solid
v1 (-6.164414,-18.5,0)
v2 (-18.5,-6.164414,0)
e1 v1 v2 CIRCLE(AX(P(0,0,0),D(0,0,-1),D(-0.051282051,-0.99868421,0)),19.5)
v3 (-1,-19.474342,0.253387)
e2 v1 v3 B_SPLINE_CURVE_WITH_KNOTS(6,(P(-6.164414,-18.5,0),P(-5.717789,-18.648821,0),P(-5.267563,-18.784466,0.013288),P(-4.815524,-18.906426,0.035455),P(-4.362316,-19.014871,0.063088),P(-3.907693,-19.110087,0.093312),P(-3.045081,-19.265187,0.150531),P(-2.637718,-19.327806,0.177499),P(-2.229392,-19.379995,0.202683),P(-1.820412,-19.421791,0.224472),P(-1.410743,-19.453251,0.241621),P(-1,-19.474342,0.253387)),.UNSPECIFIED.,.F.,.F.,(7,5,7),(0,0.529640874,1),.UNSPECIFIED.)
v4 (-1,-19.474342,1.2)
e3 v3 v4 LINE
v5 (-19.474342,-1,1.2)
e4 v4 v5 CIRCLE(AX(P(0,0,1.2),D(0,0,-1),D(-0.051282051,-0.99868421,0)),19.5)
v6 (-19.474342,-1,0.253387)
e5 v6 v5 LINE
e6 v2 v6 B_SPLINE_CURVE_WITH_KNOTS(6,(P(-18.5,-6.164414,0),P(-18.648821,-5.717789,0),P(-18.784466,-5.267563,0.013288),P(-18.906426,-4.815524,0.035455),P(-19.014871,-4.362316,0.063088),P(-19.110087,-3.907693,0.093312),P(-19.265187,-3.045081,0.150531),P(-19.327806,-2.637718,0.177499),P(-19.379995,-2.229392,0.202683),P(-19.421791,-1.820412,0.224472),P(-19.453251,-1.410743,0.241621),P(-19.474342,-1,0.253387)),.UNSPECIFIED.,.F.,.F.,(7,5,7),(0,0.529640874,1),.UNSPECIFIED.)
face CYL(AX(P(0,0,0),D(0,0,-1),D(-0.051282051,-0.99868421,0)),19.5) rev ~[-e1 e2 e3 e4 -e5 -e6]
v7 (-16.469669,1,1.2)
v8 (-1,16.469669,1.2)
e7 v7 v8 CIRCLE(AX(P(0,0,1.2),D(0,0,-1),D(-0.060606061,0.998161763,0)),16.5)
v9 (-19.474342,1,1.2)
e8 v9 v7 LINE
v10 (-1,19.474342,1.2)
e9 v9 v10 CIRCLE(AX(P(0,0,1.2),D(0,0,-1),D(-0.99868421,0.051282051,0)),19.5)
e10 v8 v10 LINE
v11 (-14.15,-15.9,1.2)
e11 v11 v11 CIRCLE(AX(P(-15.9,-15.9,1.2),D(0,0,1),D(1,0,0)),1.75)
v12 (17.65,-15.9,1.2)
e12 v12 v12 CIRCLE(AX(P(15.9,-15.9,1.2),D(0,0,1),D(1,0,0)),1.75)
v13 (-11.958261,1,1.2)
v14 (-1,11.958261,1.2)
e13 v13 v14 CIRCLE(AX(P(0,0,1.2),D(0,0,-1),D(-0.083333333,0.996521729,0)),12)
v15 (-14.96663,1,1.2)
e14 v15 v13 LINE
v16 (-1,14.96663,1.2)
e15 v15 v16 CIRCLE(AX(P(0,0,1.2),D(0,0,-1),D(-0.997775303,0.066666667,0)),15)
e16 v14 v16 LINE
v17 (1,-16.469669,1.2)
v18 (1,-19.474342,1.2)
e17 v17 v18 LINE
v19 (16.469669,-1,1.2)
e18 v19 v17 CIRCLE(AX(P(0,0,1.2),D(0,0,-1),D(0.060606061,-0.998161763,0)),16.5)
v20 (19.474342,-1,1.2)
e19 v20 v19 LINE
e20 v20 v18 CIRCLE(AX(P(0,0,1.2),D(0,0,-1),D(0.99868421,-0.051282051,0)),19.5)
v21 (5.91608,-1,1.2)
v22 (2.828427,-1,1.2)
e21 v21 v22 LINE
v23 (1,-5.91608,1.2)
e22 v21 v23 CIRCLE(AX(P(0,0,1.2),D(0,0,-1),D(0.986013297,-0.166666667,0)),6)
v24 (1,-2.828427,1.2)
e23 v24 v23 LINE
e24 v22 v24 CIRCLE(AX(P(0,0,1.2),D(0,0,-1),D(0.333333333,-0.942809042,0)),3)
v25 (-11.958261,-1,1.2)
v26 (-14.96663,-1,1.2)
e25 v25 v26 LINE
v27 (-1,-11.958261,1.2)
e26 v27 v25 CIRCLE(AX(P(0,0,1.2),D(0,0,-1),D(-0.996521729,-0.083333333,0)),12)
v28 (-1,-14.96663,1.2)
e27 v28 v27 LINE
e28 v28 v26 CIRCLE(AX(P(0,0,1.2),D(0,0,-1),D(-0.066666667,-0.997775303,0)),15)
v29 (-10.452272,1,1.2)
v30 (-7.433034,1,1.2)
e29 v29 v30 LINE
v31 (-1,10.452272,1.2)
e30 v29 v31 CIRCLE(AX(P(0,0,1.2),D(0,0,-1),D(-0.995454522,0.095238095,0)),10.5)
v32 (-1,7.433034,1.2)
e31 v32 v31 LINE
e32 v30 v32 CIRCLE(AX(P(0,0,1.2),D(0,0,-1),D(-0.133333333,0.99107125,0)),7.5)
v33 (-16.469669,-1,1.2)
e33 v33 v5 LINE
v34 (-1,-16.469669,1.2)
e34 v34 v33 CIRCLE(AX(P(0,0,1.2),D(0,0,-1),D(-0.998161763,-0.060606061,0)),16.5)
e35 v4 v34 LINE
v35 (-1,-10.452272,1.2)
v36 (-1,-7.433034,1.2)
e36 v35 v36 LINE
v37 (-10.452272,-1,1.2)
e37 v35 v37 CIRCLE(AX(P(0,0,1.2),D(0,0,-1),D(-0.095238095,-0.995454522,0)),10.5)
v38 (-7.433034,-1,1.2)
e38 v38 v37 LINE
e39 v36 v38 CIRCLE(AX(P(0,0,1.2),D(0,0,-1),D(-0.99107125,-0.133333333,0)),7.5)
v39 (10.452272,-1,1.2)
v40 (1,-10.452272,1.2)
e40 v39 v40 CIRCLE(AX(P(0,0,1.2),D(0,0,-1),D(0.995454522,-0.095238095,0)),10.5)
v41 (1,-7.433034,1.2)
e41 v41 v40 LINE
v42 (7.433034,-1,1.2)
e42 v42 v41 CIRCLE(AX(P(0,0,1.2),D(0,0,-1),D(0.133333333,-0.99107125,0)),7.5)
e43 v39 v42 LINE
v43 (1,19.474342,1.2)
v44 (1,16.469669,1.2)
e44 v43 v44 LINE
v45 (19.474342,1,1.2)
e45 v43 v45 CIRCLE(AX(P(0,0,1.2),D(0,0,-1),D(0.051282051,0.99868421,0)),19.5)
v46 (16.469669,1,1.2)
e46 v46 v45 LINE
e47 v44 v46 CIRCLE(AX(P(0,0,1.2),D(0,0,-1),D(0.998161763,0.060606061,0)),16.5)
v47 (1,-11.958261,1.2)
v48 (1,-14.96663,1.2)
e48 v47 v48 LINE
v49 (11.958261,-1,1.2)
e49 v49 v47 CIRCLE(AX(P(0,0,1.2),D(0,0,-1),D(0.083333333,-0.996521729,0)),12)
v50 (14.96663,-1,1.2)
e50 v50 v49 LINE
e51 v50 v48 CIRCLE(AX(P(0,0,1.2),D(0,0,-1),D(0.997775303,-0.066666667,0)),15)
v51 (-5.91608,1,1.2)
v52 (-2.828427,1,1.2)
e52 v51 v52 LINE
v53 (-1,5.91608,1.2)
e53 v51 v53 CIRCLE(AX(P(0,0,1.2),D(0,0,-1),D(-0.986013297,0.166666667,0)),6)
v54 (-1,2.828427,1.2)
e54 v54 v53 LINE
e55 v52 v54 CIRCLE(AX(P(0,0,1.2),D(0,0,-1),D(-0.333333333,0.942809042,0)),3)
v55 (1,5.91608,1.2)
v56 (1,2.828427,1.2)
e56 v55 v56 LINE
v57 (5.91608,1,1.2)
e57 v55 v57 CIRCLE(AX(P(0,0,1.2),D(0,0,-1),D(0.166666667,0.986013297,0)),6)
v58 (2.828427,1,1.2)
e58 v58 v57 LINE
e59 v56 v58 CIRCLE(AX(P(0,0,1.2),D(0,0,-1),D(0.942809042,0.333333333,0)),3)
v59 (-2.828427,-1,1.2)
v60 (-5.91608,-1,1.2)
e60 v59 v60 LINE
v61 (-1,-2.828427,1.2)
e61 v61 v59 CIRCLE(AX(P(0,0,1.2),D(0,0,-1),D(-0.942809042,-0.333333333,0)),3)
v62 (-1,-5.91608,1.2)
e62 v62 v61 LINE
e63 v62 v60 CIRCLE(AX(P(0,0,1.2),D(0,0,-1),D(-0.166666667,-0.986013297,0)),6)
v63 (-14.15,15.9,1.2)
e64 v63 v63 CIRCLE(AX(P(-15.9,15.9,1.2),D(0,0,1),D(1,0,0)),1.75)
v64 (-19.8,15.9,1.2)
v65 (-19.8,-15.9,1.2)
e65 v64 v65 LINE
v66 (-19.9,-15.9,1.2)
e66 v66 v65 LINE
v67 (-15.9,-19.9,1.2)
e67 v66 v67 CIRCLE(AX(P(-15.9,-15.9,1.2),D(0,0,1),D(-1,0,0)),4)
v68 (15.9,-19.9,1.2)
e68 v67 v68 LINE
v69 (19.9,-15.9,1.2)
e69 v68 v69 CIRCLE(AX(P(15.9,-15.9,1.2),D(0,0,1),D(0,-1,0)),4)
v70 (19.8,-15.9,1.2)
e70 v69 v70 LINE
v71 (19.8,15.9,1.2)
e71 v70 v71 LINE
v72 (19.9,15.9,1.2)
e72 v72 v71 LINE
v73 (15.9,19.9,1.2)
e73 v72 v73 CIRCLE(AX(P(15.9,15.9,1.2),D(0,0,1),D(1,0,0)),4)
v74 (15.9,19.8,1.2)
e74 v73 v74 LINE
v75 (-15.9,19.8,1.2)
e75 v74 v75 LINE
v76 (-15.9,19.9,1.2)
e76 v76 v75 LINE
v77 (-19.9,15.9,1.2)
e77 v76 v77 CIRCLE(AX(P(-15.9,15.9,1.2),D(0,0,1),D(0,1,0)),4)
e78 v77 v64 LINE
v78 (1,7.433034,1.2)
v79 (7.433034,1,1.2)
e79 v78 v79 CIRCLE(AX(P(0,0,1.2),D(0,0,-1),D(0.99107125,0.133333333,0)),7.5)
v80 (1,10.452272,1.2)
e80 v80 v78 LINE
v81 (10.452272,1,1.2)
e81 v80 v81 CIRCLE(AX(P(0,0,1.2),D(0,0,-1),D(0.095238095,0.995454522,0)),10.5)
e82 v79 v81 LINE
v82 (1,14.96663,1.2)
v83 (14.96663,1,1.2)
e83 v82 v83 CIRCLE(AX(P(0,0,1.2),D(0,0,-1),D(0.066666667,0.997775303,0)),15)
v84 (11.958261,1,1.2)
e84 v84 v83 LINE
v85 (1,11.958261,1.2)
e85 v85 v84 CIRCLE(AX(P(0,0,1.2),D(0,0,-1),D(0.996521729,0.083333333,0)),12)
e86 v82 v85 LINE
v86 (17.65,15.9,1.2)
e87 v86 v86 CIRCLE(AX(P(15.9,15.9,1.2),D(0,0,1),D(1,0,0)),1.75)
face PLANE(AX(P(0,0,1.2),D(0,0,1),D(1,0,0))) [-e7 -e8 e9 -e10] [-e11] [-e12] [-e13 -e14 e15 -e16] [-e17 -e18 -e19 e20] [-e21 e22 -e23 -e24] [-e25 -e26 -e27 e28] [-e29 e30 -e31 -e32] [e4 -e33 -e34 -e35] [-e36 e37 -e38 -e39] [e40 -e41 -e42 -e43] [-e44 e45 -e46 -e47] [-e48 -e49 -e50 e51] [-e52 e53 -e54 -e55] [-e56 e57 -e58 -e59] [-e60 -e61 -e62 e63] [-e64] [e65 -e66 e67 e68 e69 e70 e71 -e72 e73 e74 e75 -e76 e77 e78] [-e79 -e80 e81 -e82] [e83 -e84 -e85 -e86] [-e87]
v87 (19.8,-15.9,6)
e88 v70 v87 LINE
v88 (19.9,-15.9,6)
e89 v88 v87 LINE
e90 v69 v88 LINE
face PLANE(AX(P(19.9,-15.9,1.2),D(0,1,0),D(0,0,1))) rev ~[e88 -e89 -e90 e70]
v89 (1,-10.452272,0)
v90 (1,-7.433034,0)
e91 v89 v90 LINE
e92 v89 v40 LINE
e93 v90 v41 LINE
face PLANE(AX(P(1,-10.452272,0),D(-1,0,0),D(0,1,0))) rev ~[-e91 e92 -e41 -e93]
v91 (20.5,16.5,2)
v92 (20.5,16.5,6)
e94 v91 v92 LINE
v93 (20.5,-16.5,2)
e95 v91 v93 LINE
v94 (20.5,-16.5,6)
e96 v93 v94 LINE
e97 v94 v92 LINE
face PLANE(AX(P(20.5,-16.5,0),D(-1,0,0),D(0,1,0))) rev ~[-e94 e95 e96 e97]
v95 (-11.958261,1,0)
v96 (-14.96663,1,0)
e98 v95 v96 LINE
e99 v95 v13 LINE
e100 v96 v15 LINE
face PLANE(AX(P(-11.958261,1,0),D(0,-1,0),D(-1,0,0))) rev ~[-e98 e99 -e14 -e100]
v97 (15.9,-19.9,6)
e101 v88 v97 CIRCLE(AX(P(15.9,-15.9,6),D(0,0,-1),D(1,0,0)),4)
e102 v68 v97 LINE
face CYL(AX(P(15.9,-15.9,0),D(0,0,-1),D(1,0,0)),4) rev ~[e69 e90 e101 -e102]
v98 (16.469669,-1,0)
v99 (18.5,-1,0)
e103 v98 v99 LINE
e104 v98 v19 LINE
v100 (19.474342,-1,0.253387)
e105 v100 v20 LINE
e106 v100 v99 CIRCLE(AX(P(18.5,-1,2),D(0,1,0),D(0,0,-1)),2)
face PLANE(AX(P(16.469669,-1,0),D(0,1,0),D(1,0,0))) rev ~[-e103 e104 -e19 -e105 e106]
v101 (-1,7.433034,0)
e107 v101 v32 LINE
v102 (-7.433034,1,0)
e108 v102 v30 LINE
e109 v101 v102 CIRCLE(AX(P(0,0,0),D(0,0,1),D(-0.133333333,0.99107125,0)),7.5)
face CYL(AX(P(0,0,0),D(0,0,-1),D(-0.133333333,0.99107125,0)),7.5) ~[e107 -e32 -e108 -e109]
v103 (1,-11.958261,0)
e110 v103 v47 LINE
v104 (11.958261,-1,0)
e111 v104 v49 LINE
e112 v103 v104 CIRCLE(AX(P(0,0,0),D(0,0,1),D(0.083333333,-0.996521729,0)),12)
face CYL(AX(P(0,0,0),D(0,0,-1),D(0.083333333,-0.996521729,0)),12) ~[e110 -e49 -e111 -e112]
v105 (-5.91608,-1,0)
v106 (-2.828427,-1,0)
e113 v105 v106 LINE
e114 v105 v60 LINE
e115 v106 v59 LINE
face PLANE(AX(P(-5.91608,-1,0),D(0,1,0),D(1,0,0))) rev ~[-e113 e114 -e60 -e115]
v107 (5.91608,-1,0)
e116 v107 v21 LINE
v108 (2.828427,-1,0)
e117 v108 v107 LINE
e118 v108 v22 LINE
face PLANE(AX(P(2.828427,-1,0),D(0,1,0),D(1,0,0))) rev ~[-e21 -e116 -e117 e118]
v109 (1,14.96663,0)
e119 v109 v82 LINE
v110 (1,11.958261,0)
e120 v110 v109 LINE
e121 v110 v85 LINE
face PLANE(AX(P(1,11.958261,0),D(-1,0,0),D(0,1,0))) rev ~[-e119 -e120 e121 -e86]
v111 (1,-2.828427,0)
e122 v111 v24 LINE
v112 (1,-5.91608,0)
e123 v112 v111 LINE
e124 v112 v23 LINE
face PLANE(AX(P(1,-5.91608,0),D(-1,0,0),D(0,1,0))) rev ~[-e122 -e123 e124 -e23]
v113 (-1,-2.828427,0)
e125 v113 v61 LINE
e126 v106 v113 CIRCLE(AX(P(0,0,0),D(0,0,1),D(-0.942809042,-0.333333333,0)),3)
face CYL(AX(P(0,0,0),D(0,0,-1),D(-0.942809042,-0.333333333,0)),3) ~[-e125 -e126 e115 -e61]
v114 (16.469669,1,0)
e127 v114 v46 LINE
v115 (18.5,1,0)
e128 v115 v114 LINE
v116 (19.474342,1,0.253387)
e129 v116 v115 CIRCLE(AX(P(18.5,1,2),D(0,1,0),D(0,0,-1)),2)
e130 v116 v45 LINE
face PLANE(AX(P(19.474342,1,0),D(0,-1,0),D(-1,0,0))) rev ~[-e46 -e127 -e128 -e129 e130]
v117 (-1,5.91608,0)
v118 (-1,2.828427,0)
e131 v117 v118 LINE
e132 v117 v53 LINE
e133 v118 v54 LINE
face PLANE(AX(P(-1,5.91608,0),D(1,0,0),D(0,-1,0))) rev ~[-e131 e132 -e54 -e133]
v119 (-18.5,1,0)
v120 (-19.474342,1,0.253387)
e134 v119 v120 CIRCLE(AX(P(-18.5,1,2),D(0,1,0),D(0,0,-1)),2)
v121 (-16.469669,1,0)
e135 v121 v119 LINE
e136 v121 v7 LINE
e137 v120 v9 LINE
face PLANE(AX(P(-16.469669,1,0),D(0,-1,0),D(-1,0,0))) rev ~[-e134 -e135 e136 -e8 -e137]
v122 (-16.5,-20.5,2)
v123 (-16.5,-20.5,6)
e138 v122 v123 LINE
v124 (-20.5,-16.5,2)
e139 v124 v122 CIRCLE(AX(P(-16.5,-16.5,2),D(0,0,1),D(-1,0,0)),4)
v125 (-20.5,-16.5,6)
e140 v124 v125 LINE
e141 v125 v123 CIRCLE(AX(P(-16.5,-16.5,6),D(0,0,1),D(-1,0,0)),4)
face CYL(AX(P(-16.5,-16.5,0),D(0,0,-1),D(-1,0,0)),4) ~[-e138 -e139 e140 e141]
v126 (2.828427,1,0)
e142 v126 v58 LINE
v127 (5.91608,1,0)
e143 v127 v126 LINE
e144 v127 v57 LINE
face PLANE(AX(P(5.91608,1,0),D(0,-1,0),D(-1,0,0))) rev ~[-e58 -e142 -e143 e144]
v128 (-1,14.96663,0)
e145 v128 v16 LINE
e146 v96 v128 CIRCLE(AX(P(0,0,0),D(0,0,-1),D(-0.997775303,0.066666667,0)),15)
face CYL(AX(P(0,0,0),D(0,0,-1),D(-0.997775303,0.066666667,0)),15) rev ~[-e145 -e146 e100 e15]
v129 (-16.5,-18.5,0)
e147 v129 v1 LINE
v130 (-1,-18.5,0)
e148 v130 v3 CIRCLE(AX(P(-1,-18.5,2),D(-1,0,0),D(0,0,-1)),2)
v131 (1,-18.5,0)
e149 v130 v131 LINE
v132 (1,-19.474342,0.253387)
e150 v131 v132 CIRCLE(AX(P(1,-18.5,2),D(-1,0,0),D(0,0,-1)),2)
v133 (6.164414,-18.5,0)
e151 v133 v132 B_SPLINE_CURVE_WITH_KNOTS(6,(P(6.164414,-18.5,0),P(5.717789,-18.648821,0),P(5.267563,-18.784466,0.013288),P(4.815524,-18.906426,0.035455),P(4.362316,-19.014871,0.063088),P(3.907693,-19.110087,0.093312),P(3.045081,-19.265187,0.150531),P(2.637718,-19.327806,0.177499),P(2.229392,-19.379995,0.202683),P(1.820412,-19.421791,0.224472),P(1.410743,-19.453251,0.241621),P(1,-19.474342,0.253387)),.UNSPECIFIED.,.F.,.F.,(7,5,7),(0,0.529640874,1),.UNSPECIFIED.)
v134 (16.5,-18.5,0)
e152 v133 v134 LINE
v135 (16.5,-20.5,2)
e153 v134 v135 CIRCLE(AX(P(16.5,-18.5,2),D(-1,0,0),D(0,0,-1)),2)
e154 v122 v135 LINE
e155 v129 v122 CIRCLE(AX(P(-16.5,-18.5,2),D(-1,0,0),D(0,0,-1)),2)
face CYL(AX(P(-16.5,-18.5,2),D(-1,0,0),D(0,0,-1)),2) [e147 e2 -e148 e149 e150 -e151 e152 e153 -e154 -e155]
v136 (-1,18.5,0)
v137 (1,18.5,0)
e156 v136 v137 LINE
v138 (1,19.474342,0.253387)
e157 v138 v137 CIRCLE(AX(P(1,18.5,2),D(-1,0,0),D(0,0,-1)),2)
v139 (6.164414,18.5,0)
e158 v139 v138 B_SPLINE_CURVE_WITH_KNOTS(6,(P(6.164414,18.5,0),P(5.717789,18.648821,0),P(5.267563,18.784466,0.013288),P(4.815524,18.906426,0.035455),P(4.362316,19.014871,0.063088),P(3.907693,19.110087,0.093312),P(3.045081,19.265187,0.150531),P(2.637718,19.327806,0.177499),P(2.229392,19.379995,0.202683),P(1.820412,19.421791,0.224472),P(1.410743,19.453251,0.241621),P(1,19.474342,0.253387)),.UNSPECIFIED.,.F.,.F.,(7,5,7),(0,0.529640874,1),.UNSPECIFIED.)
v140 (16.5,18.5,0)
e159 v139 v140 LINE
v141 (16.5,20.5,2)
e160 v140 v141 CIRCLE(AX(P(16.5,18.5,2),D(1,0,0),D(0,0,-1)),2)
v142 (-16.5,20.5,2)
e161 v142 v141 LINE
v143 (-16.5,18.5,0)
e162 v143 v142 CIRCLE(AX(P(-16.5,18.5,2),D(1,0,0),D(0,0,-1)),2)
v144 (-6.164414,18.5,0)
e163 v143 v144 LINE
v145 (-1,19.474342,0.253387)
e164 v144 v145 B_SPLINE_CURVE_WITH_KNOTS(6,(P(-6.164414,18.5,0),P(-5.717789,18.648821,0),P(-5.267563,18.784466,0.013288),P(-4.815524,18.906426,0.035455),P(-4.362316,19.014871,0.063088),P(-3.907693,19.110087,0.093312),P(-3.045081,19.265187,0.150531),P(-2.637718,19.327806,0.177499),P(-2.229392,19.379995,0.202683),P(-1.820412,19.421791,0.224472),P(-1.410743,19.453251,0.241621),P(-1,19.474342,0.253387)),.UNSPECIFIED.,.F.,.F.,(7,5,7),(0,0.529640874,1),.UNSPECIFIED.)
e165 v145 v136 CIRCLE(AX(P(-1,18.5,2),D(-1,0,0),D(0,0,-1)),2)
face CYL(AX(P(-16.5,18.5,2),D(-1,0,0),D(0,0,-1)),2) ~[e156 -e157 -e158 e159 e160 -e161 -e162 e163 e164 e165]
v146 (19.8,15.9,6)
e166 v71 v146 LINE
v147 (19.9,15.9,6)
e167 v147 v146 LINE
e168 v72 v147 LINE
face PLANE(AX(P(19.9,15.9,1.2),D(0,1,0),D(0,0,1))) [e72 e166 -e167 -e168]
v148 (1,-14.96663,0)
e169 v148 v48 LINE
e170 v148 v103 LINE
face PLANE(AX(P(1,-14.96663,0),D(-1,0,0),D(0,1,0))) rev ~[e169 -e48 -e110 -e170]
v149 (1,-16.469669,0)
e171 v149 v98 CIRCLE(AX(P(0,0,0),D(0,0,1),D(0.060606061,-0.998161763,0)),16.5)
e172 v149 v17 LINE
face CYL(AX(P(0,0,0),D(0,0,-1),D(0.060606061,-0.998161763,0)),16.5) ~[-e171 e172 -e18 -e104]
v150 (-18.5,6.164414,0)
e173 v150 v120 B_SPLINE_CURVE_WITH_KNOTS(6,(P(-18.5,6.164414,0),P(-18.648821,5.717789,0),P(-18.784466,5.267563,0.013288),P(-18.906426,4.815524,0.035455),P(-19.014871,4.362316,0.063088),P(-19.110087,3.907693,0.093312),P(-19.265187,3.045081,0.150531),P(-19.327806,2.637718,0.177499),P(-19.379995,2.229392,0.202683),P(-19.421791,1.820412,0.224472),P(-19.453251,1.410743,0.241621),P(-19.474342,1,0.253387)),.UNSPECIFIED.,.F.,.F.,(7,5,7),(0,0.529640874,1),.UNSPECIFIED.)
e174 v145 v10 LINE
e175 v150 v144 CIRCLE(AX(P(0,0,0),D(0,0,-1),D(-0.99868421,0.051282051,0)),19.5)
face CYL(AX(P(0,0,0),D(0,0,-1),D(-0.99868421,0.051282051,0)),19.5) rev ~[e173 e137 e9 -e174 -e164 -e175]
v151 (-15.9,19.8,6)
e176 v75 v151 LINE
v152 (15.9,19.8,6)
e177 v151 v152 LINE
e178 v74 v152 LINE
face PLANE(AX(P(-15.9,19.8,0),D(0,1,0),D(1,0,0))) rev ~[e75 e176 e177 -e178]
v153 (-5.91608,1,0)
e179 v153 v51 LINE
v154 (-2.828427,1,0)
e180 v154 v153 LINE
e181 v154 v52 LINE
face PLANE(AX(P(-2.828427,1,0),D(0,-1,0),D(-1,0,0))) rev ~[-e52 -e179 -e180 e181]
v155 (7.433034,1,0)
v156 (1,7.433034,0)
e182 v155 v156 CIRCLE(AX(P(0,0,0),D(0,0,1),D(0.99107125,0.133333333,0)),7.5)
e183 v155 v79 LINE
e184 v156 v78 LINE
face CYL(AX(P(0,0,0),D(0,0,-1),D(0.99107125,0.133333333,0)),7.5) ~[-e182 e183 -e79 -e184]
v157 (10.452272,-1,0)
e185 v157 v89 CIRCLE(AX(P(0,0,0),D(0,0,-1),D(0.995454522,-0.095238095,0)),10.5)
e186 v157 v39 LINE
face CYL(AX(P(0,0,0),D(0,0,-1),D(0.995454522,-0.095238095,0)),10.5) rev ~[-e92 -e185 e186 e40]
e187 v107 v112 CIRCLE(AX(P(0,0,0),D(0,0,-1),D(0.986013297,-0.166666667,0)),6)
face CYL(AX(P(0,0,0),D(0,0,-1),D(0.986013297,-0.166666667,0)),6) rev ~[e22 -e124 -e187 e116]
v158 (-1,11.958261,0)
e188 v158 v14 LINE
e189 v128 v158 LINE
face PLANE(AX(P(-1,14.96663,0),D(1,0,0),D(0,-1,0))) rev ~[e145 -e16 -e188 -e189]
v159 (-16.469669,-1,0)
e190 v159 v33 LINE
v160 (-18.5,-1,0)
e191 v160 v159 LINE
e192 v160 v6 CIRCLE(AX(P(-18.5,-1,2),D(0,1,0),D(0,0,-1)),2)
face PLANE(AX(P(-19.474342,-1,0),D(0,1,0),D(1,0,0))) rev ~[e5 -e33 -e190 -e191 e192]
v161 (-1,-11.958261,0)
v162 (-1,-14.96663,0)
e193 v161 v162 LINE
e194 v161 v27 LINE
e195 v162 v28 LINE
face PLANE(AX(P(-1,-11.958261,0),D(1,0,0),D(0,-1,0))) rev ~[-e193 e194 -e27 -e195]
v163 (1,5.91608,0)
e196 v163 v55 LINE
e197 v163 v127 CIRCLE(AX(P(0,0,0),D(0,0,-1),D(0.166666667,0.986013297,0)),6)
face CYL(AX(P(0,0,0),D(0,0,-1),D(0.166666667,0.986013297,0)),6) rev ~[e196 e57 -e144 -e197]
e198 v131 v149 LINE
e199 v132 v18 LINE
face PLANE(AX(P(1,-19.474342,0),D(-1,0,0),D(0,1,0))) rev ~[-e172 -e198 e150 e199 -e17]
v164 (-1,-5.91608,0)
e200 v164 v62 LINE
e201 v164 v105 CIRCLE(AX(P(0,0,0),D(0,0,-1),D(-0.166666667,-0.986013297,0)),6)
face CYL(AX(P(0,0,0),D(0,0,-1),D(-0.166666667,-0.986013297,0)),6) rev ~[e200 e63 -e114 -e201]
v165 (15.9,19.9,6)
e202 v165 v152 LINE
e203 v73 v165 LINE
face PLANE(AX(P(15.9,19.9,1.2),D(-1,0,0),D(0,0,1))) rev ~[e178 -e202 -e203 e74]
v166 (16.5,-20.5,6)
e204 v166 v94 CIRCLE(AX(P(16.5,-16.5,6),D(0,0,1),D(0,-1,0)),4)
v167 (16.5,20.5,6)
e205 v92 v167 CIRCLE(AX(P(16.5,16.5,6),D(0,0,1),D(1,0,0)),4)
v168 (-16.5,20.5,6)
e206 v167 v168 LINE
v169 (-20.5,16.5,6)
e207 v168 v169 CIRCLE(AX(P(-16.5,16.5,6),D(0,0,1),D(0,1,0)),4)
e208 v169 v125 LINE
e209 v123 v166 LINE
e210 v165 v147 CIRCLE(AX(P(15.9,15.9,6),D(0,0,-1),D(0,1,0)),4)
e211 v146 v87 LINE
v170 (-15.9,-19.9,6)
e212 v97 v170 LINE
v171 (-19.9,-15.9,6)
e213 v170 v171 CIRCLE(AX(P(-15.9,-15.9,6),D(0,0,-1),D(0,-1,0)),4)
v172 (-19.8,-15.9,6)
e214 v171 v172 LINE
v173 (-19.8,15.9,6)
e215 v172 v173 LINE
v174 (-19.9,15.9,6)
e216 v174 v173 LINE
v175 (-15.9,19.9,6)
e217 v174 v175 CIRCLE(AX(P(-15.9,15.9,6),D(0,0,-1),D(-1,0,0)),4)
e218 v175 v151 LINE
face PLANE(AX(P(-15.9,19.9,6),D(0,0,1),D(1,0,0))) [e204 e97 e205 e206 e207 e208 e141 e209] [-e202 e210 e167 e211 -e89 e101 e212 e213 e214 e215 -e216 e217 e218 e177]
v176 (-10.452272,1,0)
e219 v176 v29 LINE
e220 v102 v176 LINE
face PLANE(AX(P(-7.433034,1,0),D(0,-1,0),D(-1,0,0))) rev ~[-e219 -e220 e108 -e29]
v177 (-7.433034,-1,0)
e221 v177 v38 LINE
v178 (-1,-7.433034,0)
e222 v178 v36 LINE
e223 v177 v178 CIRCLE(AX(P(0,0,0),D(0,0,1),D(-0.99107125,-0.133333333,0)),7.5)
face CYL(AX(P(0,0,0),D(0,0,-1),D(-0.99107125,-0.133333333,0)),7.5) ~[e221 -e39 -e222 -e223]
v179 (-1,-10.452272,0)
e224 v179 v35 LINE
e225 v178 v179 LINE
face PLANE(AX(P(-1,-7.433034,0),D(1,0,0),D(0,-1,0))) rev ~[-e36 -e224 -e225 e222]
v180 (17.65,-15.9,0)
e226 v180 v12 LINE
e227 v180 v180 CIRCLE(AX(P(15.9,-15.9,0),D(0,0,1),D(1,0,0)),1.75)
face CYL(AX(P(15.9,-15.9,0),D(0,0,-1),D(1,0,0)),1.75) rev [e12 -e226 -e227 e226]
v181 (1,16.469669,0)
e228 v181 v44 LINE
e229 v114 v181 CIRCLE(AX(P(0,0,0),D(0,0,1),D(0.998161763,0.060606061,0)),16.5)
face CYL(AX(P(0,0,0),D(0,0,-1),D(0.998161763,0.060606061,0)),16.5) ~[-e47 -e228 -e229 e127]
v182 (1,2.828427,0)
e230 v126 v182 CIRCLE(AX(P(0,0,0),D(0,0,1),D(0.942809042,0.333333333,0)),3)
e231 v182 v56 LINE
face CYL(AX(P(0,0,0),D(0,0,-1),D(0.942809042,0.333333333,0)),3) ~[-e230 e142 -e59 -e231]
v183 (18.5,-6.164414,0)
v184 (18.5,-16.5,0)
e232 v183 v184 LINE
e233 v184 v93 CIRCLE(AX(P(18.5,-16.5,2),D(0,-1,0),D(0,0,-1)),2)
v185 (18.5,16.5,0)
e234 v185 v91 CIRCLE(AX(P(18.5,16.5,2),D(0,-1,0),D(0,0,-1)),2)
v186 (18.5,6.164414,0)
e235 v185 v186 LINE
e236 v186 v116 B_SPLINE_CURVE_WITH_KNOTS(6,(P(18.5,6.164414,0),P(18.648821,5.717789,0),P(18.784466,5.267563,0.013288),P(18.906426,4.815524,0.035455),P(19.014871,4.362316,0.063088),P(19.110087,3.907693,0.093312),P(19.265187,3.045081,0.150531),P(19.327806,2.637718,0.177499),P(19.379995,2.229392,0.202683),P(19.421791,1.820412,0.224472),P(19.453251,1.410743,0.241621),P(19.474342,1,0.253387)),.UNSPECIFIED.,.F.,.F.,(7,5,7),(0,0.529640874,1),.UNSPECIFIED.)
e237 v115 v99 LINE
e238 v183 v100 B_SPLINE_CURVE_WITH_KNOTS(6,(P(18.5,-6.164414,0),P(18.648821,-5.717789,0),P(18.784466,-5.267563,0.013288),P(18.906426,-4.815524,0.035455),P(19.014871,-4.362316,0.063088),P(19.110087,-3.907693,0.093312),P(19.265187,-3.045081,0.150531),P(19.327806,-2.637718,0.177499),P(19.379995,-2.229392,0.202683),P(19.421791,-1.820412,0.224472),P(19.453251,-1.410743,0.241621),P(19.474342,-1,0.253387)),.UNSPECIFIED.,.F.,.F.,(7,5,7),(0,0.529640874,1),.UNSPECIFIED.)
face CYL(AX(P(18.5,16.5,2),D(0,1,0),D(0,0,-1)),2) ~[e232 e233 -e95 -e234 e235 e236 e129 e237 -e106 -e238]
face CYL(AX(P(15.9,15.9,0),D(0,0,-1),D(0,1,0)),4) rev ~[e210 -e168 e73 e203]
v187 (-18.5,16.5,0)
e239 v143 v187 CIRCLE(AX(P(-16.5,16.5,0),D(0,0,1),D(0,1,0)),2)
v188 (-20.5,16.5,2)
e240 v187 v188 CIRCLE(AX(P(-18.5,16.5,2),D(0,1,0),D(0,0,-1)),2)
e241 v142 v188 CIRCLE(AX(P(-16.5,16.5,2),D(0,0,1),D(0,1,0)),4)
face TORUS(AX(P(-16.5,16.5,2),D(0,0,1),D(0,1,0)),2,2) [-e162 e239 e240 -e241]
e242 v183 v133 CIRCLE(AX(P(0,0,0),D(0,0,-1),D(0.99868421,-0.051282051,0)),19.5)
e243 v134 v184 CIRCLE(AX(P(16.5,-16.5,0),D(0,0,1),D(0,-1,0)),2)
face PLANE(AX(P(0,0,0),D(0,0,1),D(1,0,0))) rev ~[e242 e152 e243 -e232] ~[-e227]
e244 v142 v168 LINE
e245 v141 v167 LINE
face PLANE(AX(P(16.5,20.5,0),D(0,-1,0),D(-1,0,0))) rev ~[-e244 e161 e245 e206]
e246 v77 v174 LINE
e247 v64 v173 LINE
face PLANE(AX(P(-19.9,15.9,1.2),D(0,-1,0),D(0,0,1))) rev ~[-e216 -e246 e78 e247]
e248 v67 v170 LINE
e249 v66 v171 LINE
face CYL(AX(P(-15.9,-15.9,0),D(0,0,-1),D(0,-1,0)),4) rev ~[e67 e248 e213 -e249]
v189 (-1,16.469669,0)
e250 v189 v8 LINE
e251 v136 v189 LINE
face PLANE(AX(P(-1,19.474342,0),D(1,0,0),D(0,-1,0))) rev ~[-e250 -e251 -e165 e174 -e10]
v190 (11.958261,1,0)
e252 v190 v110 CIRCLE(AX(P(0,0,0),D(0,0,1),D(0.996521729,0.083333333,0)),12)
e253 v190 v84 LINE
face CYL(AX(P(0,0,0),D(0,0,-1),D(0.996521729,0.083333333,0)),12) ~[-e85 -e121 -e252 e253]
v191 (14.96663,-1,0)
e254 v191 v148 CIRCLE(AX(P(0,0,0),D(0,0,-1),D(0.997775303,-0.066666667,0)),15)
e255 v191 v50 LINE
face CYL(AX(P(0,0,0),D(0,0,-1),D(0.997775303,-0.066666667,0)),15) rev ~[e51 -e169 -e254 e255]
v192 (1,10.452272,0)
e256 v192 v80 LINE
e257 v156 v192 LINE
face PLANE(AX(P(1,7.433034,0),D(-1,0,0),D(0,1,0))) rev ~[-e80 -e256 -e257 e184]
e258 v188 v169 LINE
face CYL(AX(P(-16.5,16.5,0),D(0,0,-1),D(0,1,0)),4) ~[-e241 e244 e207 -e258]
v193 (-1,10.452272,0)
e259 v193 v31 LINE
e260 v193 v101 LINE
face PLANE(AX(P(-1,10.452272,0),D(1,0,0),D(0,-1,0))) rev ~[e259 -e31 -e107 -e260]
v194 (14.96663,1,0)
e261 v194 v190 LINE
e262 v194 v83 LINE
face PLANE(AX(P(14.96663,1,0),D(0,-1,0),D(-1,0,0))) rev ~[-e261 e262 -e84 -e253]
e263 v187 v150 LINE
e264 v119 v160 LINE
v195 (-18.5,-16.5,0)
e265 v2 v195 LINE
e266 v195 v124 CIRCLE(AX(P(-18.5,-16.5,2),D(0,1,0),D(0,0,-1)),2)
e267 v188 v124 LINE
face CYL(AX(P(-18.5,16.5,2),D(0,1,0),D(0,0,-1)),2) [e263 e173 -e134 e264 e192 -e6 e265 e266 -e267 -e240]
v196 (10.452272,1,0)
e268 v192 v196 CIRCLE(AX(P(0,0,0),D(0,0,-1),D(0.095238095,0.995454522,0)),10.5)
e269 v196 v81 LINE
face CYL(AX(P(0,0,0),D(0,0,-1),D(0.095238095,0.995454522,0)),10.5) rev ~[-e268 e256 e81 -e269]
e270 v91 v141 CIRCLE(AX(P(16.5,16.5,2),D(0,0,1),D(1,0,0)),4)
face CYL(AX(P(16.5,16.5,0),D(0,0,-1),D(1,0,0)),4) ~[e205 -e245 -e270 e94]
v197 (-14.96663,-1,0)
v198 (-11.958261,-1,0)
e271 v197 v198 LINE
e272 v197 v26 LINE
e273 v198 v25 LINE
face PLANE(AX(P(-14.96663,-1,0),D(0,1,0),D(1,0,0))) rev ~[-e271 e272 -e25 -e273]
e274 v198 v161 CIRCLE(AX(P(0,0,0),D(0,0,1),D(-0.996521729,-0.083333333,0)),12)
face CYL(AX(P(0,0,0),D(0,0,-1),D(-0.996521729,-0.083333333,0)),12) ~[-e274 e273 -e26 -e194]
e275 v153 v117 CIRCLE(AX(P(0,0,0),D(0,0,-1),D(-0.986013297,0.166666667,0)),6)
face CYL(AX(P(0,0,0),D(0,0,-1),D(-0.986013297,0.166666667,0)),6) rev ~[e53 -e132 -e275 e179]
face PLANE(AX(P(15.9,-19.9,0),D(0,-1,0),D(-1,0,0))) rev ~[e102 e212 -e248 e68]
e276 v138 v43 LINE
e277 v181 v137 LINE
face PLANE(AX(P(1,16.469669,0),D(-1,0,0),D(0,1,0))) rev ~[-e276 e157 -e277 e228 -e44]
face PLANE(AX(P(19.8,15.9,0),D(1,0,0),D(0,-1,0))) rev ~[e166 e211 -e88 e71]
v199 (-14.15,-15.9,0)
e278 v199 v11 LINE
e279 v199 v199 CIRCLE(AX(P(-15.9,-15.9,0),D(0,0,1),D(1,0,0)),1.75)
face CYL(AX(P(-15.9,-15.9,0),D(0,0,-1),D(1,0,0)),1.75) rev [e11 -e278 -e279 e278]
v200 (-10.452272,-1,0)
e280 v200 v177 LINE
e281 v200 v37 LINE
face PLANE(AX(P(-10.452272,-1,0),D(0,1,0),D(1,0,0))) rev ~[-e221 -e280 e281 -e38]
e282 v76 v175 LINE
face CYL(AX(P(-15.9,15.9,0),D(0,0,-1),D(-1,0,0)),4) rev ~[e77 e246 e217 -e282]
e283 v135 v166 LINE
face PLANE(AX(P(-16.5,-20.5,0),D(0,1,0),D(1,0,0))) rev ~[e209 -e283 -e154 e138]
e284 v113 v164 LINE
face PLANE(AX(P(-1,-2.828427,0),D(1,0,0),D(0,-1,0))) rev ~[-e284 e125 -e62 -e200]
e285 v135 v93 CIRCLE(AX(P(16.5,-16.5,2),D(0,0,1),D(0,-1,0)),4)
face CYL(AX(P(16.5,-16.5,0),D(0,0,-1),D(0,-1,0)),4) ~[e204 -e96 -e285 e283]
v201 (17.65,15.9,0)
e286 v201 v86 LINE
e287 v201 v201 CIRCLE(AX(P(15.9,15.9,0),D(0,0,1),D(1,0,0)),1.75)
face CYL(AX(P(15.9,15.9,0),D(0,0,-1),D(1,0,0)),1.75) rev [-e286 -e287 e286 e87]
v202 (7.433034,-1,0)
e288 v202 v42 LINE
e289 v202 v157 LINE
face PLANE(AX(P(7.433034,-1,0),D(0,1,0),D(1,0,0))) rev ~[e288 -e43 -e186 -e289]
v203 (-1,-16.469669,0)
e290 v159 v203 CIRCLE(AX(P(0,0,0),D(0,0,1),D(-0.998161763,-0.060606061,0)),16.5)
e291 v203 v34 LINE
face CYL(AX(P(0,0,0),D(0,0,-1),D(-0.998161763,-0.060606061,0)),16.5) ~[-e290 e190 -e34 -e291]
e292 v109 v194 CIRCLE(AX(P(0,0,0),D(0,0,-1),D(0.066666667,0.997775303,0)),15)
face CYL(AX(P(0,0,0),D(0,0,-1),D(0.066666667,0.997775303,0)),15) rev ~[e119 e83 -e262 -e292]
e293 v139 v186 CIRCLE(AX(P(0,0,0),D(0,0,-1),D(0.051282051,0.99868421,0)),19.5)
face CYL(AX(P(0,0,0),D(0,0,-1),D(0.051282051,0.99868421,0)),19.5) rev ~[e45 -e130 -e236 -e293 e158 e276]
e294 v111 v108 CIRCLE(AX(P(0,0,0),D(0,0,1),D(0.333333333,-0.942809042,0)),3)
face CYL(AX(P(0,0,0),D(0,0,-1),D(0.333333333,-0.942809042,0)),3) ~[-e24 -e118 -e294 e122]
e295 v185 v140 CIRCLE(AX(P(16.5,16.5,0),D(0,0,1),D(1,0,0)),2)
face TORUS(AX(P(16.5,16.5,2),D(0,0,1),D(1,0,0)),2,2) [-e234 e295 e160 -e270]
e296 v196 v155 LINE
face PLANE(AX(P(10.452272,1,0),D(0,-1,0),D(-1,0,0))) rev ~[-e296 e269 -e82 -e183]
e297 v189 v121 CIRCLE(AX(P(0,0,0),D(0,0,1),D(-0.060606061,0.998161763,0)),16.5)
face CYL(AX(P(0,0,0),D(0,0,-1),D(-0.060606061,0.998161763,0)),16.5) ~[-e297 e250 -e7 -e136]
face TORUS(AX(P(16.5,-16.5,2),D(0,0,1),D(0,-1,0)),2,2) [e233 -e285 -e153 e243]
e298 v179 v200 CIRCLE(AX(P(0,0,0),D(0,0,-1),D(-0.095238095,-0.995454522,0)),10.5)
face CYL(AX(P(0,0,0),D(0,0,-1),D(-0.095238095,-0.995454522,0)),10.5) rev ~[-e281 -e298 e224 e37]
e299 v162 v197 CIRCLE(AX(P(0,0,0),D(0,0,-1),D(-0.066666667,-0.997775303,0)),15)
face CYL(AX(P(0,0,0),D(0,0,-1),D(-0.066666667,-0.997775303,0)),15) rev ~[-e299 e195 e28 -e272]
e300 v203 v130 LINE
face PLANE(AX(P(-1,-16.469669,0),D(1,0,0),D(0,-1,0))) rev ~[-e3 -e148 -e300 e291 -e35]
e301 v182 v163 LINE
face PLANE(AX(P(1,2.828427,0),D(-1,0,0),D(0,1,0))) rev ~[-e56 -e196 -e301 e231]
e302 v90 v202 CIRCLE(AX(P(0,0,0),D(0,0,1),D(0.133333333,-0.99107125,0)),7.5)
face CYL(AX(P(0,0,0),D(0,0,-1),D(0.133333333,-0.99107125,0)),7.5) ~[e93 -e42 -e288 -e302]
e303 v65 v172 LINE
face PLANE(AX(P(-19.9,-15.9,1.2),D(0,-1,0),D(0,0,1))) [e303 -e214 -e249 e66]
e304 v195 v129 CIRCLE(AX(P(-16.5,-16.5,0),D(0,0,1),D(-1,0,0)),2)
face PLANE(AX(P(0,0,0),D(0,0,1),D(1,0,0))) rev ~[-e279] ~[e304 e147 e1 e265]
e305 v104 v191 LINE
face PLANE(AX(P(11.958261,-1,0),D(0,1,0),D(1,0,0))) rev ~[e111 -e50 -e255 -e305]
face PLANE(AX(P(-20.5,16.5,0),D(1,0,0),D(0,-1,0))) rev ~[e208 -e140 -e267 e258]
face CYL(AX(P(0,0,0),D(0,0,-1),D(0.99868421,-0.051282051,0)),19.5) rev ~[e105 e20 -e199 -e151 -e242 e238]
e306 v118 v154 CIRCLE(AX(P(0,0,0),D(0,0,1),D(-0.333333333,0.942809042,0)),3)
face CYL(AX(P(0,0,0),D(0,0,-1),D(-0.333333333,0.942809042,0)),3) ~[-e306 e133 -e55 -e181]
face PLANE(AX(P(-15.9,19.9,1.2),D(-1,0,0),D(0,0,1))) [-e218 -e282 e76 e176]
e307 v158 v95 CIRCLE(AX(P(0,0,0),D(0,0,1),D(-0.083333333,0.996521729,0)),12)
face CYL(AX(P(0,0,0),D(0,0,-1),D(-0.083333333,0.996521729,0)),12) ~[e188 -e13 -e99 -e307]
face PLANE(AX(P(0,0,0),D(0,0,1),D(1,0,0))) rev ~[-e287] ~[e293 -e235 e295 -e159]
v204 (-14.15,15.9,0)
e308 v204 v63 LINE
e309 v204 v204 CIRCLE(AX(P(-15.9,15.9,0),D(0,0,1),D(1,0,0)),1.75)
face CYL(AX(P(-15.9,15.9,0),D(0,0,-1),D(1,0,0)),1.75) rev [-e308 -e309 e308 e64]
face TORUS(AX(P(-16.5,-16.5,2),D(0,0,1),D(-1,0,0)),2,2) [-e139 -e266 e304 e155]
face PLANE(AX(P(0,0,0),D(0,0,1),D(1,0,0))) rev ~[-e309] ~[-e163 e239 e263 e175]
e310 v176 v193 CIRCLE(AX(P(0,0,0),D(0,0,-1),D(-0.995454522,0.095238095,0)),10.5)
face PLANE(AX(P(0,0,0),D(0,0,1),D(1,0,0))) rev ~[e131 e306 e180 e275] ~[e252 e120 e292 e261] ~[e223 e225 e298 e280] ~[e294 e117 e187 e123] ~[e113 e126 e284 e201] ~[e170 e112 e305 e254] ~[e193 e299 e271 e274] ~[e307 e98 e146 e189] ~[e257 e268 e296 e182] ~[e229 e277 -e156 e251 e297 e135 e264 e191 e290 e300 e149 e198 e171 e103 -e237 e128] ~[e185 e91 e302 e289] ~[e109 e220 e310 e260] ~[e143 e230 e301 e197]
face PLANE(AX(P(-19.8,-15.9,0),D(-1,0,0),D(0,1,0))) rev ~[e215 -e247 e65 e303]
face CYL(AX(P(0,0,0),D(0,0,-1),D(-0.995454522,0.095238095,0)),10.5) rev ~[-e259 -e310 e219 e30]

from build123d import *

# Parameters (mm, degrees)
F0_R         = 1.75
F1_DEPTH     = 1.2
F2_DEPTH     = 6
F4_DEPTH     = 10
F5_T1_DEPTH  = 33
F5_T3_DEPTH  = 33
F5_T6_ANGLE  = 90
F5_T8_ANGLE  = 90
F5_T10_ANGLE = 90
F5_T12_ANGLE = 90
F6_DEPTH     = 0.1
F7_DEPTH     = 0.1
F8_DEPTH     = 0.1


# Not quite as in the source:
# - a fillet or chamfer that OpenCascade refuses, or shapes differently, is made with other operations: its cross-section is extruded or revolved along the edge and cut away or added


with BuildPart() as f1:
    # F0 (on Top) → F1 (new body)
    with BuildSketch(Plane.XY):
        with BuildLine():
            Line((-15.9, -19.9), (15.9, -19.9))
            ThreePointArc((15.9, -19.9), (18.7284271247, -18.7284271247), (19.9, -15.9))
            Line((19.9, -15.9), (19.9, 15.9))
            ThreePointArc((19.9, 15.9), (18.7284271247, 18.7284271247), (15.9, 19.9))
            Line((15.9, 19.9), (-15.9, 19.9))
            ThreePointArc((-15.9, 19.9), (-18.7284271247, 18.7284271247), (-19.9, 15.9))
            Line((-19.9, 15.9), (-19.9, -15.9))
            ThreePointArc((-19.9, -15.9), (-18.7284271247, -18.7284271247), (-15.9, -19.9))
        make_face()
        with Locations((-15.9, -15.9)):
            Circle(F0_R, mode=Mode.SUBTRACT)
        with Locations((15.9, -15.9)):
            Circle(F0_R, mode=Mode.SUBTRACT)
        with Locations((-15.9, 15.9)):
            Circle(F0_R, mode=Mode.SUBTRACT)
        with Locations((15.9, 15.9)):
            Circle(F0_R, mode=Mode.SUBTRACT)
    extrude(amount=F1_DEPTH)

    # F0 (on Top) → F2 (join)
    with BuildSketch(Plane.XY):
        with BuildLine():
            Line((-16.5, -20.5), (16.5, -20.5))
            ThreePointArc((16.5, -20.5), (19.3284271247, -19.3284271247), (20.5, -16.5))
            Line((20.5, -16.5), (20.5, 16.5))
            ThreePointArc((20.5, 16.5), (19.3284271247, 19.3284271247), (16.5, 20.5))
            Line((16.5, 20.5), (-16.5, 20.5))
            ThreePointArc((-16.5, 20.5), (-19.3284271247, 19.3284271247), (-20.5, 16.5))
            Line((-20.5, 16.5), (-20.5, -16.5))
            ThreePointArc((-20.5, -16.5), (-19.3284271247, -19.3284271247), (-16.5, -20.5))
        make_face()
        with BuildLine():
            ThreePointArc((19.9, -15.9), (18.7284271247, -18.7284271247), (15.9, -19.9))
            Line((15.9, -19.9), (-15.9, -19.9))
            ThreePointArc((-15.9, -19.9), (-18.7284271247, -18.7284271247), (-19.9, -15.9))
            Line((-19.9, -15.9), (-19.9, 15.9))
            ThreePointArc((-19.9, 15.9), (-18.7284271247, 18.7284271247), (-15.9, 19.9))
            Line((-15.9, 19.9), (15.9, 19.9))
            ThreePointArc((15.9, 19.9), (18.7284271247, 18.7284271247), (19.9, 15.9))
            Line((19.9, 15.9), (19.9, -15.9))
        make_face(mode=Mode.SUBTRACT)
    extrude(amount=F2_DEPTH)

    # F3 (on face) → F4 (cut)
    with BuildSketch(Plane(origin=(0, 0, 0), x_dir=(1, 0, 0), z_dir=(0, 0, -1))):
        with BuildLine():
            ThreePointArc((1, 2.8284271247), (2.1213203436, 2.1213203436), (2.8284271247, 1))
            Line((2.8284271247, 1), (5.9160797831, 1))
            ThreePointArc((5.9160797831, 1), (4.2426406871, 4.2426406871), (1, 5.9160797831))
            Line((1, 5.9160797831), (1, 2.8284271247))
        make_face()
        with BuildLine():
            Line((5.9160797831, -1), (2.8284271247, -1))
            ThreePointArc((2.8284271247, -1), (2.1213203436, -2.1213203436), (1, -2.8284271247))
            Line((1, -2.8284271247), (1, -5.9160797831))
            ThreePointArc((1, -5.9160797831), (4.2426406871, -4.2426406871), (5.9160797831, -1))
        make_face()
        with BuildLine():
            ThreePointArc((-2.8284271247, 1), (-2.1213203436, 2.1213203436), (-1, 2.8284271247))
            Line((-1, 2.8284271247), (-1, 5.9160797831))
            ThreePointArc((-1, 5.9160797831), (-4.2426406871, 4.2426406871), (-5.9160797831, 1))
            Line((-5.9160797831, 1), (-2.8284271247, 1))
        make_face()
        with BuildLine():
            ThreePointArc((1, 7.4330343737), (5.3033008589, 5.3033008589), (7.4330343737, 1))
            Line((7.4330343737, 1), (10.4522724802, 1))
            ThreePointArc((10.4522724802, 1), (7.4246212025, 7.4246212025), (1, 10.4522724802))
            Line((1, 10.4522724802), (1, 7.4330343737))
        make_face()
        with BuildLine():
            Line((-1, -5.9160797831), (-1, -2.8284271247))
            ThreePointArc((-1, -2.8284271247), (-2.1213203436, -2.1213203436), (-2.8284271247, -1))
            Line((-2.8284271247, -1), (-5.9160797831, -1))
            ThreePointArc((-5.9160797831, -1), (-4.2426406871, -4.2426406871), (-1, -5.9160797831))
        make_face()
        with BuildLine():
            Line((10.4522724802, -1), (7.4330343737, -1))
            ThreePointArc((7.4330343737, -1), (5.3033008589, -5.3033008589), (1, -7.4330343737))
            Line((1, -7.4330343737), (1, -10.4522724802))
            ThreePointArc((1, -10.4522724802), (7.4246212025, -7.4246212025), (10.4522724802, -1))
        make_face()
        with BuildLine():
            ThreePointArc((-7.4330343737, 1), (-5.3033008589, 5.3033008589), (-1, 7.4330343737))
            Line((-1, 7.4330343737), (-1, 10.4522724802))
            ThreePointArc((-1, 10.4522724802), (-7.4246212025, 7.4246212025), (-10.4522724802, 1))
            Line((-10.4522724802, 1), (-7.4330343737, 1))
        make_face()
        with BuildLine():
            ThreePointArc((1, 11.9582607431), (8.4852813742, 8.4852813742), (11.9582607431, 1))
            Line((11.9582607431, 1), (14.9666295471, 1))
            ThreePointArc((14.9666295471, 1), (10.6066017178, 10.6066017178), (1, 14.9666295471))
            Line((1, 14.9666295471), (1, 11.9582607431))
        make_face()
        with BuildLine():
            Line((-1, -10.4522724802), (-1, -7.4330343737))
            ThreePointArc((-1, -7.4330343737), (-5.3033008589, -5.3033008589), (-7.4330343737, -1))
            Line((-7.4330343737, -1), (-10.4522724802, -1))
            ThreePointArc((-10.4522724802, -1), (-7.4246212025, -7.4246212025), (-1, -10.4522724802))
        make_face()
        with BuildLine():
            Line((14.9666295471, -1), (11.9582607431, -1))
            ThreePointArc((11.9582607431, -1), (8.4852813742, -8.4852813742), (1, -11.9582607431))
            Line((1, -11.9582607431), (1, -14.9666295471))
            ThreePointArc((1, -14.9666295471), (10.6066017178, -10.6066017178), (14.9666295471, -1))
        make_face()
        with BuildLine():
            ThreePointArc((-11.9582607431, 1), (-8.4852813742, 8.4852813742), (-1, 11.9582607431))
            Line((-1, 11.9582607431), (-1, 14.9666295471))
            ThreePointArc((-1, 14.9666295471), (-10.6066017178, 10.6066017178), (-14.9666295471, 1))
            Line((-14.9666295471, 1), (-11.9582607431, 1))
        make_face()
        with BuildLine():
            ThreePointArc((1, 16.469669092), (11.6672618896, 11.6672618896), (16.469669092, 1))
            Line((16.469669092, 1), (19.4743420942, 1))
            ThreePointArc((19.4743420942, 1), (13.7885822331, 13.7885822331), (1, 19.4743420942))
            Line((1, 19.4743420942), (1, 16.469669092))
        make_face()
        with BuildLine():
            Line((-1, -14.9666295471), (-1, -11.9582607431))
            ThreePointArc((-1, -11.9582607431), (-8.4852813742, -8.4852813742), (-11.9582607431, -1))
            Line((-11.9582607431, -1), (-14.9666295471, -1))
            ThreePointArc((-14.9666295471, -1), (-10.6066017178, -10.6066017178), (-1, -14.9666295471))
        make_face()
        with BuildLine():
            Line((19.4743420942, -1), (16.469669092, -1))
            ThreePointArc((16.469669092, -1), (11.6672618896, -11.6672618896), (1, -16.469669092))
            Line((1, -16.469669092), (1, -19.4743420942))
            ThreePointArc((1, -19.4743420942), (13.7885822331, -13.7885822331), (19.4743420942, -1))
        make_face()
        with BuildLine():
            ThreePointArc((-16.469669092, 1), (-11.6672618896, 11.6672618896), (-1, 16.469669092))
            Line((-1, 16.469669092), (-1, 19.4743420942))
            ThreePointArc((-1, 19.4743420942), (-13.7885822331, 13.7885822331), (-19.4743420942, 1))
            Line((-19.4743420942, 1), (-16.469669092, 1))
        make_face()
        with BuildLine():
            Line((-1, -19.4743420942), (-1, -16.469669092))
            ThreePointArc((-1, -16.469669092), (-11.6672618896, -11.6672618896), (-16.469669092, -1))
            Line((-16.469669092, -1), (-19.4743420942, -1))
            ThreePointArc((-19.4743420942, -1), (-13.7885822331, -13.7885822331), (-1, -19.4743420942))
        make_face()
    extrude(amount=-F4_DEPTH, mode=Mode.SUBTRACT)

    # F5: fillet of radius 2 on 8 edges, made by hand

    # F5_s2 → F5_t1 (cut)
    with BuildSketch(Plane.YZ.offset(-16.5)):
        with BuildLine():
            ThreePointArc((-18.5, 0), (-19.9142135624, 0.5857864376), (-20.5, 2))
            Line((-20.5, 2), (-20.5, 0))
            Line((-20.5, 0), (-18.5, 0))
        make_face()
        with BuildLine():
            ThreePointArc((18.5, 0), (19.9142135624, 0.5857864376), (20.5, 2))
            Line((20.5, 2), (20.5, 0))
            Line((20.5, 0), (18.5, 0))
        make_face()
    extrude(amount=F5_T1_DEPTH, mode=Mode.SUBTRACT)

    # F5_s4 → F5_t3 (cut)
    with BuildSketch(Plane.XZ.offset(-16.5)):
        with BuildLine():
            ThreePointArc((-18.5, 0), (-19.9142135624, 0.5857864376), (-20.5, 2))
            Line((-20.5, 2), (-20.5, 0))
            Line((-20.5, 0), (-18.5, 0))
        make_face()
        with BuildLine():
            ThreePointArc((18.5, 0), (19.9142135624, 0.5857864376), (20.5, 2))
            Line((20.5, 2), (20.5, 0))
            Line((20.5, 0), (18.5, 0))
        make_face()
    extrude(amount=F5_T3_DEPTH, mode=Mode.SUBTRACT)

    # F5_s5 → F5_t6 (revolve, cut)
    with BuildSketch(Plane.XZ.offset(16.5)):
        with BuildLine():
            ThreePointArc((-18.5, 0), (-19.9142135624, 0.5857864376), (-20.5, 2))
            Line((-20.5, 2), (-20.5, 0))
            Line((-20.5, 0), (-18.5, 0))
        make_face()
    revolve(axis=Axis((-16.5, -16.5, 0), (0, 0, 1)), revolution_arc=F5_T6_ANGLE, mode=Mode.SUBTRACT)

    # F5_s7 → F5_t8 (revolve, cut)
    with BuildSketch(Plane.YZ.offset(16.5)):
        with BuildLine():
            ThreePointArc((-18.5, 0), (-19.9142135624, 0.5857864376), (-20.5, 2))
            Line((-20.5, 2), (-20.5, 0))
            Line((-20.5, 0), (-18.5, 0))
        make_face()
    revolve(axis=Axis((16.5, -16.5, 0), (0, 0, 1)), revolution_arc=F5_T8_ANGLE, mode=Mode.SUBTRACT)

    # F5_s9 → F5_t10 (revolve, cut)
    with BuildSketch(Plane.XZ.offset(-16.5)):
        with BuildLine():
            ThreePointArc((18.5, 0), (19.9142135624, 0.5857864376), (20.5, 2))
            Line((20.5, 2), (20.5, 0))
            Line((20.5, 0), (18.5, 0))
        make_face()
    revolve(axis=Axis((16.5, 16.5, 0), (0, 0, 1)), revolution_arc=F5_T10_ANGLE, mode=Mode.SUBTRACT)

    # F5_s11 → F5_t12 (revolve, cut)
    with BuildSketch(Plane.YZ.offset(-16.5)):
        with BuildLine():
            ThreePointArc((18.5, 0), (19.9142135624, 0.5857864376), (20.5, 2))
            Line((20.5, 2), (20.5, 0))
            Line((20.5, 0), (18.5, 0))
        make_face()
    revolve(axis=Axis((-16.5, 16.5, 0), (0, 0, 1)), revolution_arc=F5_T12_ANGLE, mode=Mode.SUBTRACT)

    # F6 (add): a face of the model
    f6_faces = [f1.faces().sort_by_distance(p)[0] for p in [
        (19.9, 0, 3.6),
    ]]
    extrude(f6_faces, amount=F6_DEPTH)

    # F7 (add): a face of the model
    f7_faces = [f1.faces().sort_by_distance(p)[0] for p in [
        (-19.9, 0, 3.6),
    ]]
    extrude(f7_faces, amount=F7_DEPTH)

    # F8 (add): a face of the model
    f8_faces = [f1.faces().sort_by_distance(p)[0] for p in [
        (0, 19.9, 3.6),
    ]]
    extrude(f8_faces, amount=F8_DEPTH)


solid = f1.part
